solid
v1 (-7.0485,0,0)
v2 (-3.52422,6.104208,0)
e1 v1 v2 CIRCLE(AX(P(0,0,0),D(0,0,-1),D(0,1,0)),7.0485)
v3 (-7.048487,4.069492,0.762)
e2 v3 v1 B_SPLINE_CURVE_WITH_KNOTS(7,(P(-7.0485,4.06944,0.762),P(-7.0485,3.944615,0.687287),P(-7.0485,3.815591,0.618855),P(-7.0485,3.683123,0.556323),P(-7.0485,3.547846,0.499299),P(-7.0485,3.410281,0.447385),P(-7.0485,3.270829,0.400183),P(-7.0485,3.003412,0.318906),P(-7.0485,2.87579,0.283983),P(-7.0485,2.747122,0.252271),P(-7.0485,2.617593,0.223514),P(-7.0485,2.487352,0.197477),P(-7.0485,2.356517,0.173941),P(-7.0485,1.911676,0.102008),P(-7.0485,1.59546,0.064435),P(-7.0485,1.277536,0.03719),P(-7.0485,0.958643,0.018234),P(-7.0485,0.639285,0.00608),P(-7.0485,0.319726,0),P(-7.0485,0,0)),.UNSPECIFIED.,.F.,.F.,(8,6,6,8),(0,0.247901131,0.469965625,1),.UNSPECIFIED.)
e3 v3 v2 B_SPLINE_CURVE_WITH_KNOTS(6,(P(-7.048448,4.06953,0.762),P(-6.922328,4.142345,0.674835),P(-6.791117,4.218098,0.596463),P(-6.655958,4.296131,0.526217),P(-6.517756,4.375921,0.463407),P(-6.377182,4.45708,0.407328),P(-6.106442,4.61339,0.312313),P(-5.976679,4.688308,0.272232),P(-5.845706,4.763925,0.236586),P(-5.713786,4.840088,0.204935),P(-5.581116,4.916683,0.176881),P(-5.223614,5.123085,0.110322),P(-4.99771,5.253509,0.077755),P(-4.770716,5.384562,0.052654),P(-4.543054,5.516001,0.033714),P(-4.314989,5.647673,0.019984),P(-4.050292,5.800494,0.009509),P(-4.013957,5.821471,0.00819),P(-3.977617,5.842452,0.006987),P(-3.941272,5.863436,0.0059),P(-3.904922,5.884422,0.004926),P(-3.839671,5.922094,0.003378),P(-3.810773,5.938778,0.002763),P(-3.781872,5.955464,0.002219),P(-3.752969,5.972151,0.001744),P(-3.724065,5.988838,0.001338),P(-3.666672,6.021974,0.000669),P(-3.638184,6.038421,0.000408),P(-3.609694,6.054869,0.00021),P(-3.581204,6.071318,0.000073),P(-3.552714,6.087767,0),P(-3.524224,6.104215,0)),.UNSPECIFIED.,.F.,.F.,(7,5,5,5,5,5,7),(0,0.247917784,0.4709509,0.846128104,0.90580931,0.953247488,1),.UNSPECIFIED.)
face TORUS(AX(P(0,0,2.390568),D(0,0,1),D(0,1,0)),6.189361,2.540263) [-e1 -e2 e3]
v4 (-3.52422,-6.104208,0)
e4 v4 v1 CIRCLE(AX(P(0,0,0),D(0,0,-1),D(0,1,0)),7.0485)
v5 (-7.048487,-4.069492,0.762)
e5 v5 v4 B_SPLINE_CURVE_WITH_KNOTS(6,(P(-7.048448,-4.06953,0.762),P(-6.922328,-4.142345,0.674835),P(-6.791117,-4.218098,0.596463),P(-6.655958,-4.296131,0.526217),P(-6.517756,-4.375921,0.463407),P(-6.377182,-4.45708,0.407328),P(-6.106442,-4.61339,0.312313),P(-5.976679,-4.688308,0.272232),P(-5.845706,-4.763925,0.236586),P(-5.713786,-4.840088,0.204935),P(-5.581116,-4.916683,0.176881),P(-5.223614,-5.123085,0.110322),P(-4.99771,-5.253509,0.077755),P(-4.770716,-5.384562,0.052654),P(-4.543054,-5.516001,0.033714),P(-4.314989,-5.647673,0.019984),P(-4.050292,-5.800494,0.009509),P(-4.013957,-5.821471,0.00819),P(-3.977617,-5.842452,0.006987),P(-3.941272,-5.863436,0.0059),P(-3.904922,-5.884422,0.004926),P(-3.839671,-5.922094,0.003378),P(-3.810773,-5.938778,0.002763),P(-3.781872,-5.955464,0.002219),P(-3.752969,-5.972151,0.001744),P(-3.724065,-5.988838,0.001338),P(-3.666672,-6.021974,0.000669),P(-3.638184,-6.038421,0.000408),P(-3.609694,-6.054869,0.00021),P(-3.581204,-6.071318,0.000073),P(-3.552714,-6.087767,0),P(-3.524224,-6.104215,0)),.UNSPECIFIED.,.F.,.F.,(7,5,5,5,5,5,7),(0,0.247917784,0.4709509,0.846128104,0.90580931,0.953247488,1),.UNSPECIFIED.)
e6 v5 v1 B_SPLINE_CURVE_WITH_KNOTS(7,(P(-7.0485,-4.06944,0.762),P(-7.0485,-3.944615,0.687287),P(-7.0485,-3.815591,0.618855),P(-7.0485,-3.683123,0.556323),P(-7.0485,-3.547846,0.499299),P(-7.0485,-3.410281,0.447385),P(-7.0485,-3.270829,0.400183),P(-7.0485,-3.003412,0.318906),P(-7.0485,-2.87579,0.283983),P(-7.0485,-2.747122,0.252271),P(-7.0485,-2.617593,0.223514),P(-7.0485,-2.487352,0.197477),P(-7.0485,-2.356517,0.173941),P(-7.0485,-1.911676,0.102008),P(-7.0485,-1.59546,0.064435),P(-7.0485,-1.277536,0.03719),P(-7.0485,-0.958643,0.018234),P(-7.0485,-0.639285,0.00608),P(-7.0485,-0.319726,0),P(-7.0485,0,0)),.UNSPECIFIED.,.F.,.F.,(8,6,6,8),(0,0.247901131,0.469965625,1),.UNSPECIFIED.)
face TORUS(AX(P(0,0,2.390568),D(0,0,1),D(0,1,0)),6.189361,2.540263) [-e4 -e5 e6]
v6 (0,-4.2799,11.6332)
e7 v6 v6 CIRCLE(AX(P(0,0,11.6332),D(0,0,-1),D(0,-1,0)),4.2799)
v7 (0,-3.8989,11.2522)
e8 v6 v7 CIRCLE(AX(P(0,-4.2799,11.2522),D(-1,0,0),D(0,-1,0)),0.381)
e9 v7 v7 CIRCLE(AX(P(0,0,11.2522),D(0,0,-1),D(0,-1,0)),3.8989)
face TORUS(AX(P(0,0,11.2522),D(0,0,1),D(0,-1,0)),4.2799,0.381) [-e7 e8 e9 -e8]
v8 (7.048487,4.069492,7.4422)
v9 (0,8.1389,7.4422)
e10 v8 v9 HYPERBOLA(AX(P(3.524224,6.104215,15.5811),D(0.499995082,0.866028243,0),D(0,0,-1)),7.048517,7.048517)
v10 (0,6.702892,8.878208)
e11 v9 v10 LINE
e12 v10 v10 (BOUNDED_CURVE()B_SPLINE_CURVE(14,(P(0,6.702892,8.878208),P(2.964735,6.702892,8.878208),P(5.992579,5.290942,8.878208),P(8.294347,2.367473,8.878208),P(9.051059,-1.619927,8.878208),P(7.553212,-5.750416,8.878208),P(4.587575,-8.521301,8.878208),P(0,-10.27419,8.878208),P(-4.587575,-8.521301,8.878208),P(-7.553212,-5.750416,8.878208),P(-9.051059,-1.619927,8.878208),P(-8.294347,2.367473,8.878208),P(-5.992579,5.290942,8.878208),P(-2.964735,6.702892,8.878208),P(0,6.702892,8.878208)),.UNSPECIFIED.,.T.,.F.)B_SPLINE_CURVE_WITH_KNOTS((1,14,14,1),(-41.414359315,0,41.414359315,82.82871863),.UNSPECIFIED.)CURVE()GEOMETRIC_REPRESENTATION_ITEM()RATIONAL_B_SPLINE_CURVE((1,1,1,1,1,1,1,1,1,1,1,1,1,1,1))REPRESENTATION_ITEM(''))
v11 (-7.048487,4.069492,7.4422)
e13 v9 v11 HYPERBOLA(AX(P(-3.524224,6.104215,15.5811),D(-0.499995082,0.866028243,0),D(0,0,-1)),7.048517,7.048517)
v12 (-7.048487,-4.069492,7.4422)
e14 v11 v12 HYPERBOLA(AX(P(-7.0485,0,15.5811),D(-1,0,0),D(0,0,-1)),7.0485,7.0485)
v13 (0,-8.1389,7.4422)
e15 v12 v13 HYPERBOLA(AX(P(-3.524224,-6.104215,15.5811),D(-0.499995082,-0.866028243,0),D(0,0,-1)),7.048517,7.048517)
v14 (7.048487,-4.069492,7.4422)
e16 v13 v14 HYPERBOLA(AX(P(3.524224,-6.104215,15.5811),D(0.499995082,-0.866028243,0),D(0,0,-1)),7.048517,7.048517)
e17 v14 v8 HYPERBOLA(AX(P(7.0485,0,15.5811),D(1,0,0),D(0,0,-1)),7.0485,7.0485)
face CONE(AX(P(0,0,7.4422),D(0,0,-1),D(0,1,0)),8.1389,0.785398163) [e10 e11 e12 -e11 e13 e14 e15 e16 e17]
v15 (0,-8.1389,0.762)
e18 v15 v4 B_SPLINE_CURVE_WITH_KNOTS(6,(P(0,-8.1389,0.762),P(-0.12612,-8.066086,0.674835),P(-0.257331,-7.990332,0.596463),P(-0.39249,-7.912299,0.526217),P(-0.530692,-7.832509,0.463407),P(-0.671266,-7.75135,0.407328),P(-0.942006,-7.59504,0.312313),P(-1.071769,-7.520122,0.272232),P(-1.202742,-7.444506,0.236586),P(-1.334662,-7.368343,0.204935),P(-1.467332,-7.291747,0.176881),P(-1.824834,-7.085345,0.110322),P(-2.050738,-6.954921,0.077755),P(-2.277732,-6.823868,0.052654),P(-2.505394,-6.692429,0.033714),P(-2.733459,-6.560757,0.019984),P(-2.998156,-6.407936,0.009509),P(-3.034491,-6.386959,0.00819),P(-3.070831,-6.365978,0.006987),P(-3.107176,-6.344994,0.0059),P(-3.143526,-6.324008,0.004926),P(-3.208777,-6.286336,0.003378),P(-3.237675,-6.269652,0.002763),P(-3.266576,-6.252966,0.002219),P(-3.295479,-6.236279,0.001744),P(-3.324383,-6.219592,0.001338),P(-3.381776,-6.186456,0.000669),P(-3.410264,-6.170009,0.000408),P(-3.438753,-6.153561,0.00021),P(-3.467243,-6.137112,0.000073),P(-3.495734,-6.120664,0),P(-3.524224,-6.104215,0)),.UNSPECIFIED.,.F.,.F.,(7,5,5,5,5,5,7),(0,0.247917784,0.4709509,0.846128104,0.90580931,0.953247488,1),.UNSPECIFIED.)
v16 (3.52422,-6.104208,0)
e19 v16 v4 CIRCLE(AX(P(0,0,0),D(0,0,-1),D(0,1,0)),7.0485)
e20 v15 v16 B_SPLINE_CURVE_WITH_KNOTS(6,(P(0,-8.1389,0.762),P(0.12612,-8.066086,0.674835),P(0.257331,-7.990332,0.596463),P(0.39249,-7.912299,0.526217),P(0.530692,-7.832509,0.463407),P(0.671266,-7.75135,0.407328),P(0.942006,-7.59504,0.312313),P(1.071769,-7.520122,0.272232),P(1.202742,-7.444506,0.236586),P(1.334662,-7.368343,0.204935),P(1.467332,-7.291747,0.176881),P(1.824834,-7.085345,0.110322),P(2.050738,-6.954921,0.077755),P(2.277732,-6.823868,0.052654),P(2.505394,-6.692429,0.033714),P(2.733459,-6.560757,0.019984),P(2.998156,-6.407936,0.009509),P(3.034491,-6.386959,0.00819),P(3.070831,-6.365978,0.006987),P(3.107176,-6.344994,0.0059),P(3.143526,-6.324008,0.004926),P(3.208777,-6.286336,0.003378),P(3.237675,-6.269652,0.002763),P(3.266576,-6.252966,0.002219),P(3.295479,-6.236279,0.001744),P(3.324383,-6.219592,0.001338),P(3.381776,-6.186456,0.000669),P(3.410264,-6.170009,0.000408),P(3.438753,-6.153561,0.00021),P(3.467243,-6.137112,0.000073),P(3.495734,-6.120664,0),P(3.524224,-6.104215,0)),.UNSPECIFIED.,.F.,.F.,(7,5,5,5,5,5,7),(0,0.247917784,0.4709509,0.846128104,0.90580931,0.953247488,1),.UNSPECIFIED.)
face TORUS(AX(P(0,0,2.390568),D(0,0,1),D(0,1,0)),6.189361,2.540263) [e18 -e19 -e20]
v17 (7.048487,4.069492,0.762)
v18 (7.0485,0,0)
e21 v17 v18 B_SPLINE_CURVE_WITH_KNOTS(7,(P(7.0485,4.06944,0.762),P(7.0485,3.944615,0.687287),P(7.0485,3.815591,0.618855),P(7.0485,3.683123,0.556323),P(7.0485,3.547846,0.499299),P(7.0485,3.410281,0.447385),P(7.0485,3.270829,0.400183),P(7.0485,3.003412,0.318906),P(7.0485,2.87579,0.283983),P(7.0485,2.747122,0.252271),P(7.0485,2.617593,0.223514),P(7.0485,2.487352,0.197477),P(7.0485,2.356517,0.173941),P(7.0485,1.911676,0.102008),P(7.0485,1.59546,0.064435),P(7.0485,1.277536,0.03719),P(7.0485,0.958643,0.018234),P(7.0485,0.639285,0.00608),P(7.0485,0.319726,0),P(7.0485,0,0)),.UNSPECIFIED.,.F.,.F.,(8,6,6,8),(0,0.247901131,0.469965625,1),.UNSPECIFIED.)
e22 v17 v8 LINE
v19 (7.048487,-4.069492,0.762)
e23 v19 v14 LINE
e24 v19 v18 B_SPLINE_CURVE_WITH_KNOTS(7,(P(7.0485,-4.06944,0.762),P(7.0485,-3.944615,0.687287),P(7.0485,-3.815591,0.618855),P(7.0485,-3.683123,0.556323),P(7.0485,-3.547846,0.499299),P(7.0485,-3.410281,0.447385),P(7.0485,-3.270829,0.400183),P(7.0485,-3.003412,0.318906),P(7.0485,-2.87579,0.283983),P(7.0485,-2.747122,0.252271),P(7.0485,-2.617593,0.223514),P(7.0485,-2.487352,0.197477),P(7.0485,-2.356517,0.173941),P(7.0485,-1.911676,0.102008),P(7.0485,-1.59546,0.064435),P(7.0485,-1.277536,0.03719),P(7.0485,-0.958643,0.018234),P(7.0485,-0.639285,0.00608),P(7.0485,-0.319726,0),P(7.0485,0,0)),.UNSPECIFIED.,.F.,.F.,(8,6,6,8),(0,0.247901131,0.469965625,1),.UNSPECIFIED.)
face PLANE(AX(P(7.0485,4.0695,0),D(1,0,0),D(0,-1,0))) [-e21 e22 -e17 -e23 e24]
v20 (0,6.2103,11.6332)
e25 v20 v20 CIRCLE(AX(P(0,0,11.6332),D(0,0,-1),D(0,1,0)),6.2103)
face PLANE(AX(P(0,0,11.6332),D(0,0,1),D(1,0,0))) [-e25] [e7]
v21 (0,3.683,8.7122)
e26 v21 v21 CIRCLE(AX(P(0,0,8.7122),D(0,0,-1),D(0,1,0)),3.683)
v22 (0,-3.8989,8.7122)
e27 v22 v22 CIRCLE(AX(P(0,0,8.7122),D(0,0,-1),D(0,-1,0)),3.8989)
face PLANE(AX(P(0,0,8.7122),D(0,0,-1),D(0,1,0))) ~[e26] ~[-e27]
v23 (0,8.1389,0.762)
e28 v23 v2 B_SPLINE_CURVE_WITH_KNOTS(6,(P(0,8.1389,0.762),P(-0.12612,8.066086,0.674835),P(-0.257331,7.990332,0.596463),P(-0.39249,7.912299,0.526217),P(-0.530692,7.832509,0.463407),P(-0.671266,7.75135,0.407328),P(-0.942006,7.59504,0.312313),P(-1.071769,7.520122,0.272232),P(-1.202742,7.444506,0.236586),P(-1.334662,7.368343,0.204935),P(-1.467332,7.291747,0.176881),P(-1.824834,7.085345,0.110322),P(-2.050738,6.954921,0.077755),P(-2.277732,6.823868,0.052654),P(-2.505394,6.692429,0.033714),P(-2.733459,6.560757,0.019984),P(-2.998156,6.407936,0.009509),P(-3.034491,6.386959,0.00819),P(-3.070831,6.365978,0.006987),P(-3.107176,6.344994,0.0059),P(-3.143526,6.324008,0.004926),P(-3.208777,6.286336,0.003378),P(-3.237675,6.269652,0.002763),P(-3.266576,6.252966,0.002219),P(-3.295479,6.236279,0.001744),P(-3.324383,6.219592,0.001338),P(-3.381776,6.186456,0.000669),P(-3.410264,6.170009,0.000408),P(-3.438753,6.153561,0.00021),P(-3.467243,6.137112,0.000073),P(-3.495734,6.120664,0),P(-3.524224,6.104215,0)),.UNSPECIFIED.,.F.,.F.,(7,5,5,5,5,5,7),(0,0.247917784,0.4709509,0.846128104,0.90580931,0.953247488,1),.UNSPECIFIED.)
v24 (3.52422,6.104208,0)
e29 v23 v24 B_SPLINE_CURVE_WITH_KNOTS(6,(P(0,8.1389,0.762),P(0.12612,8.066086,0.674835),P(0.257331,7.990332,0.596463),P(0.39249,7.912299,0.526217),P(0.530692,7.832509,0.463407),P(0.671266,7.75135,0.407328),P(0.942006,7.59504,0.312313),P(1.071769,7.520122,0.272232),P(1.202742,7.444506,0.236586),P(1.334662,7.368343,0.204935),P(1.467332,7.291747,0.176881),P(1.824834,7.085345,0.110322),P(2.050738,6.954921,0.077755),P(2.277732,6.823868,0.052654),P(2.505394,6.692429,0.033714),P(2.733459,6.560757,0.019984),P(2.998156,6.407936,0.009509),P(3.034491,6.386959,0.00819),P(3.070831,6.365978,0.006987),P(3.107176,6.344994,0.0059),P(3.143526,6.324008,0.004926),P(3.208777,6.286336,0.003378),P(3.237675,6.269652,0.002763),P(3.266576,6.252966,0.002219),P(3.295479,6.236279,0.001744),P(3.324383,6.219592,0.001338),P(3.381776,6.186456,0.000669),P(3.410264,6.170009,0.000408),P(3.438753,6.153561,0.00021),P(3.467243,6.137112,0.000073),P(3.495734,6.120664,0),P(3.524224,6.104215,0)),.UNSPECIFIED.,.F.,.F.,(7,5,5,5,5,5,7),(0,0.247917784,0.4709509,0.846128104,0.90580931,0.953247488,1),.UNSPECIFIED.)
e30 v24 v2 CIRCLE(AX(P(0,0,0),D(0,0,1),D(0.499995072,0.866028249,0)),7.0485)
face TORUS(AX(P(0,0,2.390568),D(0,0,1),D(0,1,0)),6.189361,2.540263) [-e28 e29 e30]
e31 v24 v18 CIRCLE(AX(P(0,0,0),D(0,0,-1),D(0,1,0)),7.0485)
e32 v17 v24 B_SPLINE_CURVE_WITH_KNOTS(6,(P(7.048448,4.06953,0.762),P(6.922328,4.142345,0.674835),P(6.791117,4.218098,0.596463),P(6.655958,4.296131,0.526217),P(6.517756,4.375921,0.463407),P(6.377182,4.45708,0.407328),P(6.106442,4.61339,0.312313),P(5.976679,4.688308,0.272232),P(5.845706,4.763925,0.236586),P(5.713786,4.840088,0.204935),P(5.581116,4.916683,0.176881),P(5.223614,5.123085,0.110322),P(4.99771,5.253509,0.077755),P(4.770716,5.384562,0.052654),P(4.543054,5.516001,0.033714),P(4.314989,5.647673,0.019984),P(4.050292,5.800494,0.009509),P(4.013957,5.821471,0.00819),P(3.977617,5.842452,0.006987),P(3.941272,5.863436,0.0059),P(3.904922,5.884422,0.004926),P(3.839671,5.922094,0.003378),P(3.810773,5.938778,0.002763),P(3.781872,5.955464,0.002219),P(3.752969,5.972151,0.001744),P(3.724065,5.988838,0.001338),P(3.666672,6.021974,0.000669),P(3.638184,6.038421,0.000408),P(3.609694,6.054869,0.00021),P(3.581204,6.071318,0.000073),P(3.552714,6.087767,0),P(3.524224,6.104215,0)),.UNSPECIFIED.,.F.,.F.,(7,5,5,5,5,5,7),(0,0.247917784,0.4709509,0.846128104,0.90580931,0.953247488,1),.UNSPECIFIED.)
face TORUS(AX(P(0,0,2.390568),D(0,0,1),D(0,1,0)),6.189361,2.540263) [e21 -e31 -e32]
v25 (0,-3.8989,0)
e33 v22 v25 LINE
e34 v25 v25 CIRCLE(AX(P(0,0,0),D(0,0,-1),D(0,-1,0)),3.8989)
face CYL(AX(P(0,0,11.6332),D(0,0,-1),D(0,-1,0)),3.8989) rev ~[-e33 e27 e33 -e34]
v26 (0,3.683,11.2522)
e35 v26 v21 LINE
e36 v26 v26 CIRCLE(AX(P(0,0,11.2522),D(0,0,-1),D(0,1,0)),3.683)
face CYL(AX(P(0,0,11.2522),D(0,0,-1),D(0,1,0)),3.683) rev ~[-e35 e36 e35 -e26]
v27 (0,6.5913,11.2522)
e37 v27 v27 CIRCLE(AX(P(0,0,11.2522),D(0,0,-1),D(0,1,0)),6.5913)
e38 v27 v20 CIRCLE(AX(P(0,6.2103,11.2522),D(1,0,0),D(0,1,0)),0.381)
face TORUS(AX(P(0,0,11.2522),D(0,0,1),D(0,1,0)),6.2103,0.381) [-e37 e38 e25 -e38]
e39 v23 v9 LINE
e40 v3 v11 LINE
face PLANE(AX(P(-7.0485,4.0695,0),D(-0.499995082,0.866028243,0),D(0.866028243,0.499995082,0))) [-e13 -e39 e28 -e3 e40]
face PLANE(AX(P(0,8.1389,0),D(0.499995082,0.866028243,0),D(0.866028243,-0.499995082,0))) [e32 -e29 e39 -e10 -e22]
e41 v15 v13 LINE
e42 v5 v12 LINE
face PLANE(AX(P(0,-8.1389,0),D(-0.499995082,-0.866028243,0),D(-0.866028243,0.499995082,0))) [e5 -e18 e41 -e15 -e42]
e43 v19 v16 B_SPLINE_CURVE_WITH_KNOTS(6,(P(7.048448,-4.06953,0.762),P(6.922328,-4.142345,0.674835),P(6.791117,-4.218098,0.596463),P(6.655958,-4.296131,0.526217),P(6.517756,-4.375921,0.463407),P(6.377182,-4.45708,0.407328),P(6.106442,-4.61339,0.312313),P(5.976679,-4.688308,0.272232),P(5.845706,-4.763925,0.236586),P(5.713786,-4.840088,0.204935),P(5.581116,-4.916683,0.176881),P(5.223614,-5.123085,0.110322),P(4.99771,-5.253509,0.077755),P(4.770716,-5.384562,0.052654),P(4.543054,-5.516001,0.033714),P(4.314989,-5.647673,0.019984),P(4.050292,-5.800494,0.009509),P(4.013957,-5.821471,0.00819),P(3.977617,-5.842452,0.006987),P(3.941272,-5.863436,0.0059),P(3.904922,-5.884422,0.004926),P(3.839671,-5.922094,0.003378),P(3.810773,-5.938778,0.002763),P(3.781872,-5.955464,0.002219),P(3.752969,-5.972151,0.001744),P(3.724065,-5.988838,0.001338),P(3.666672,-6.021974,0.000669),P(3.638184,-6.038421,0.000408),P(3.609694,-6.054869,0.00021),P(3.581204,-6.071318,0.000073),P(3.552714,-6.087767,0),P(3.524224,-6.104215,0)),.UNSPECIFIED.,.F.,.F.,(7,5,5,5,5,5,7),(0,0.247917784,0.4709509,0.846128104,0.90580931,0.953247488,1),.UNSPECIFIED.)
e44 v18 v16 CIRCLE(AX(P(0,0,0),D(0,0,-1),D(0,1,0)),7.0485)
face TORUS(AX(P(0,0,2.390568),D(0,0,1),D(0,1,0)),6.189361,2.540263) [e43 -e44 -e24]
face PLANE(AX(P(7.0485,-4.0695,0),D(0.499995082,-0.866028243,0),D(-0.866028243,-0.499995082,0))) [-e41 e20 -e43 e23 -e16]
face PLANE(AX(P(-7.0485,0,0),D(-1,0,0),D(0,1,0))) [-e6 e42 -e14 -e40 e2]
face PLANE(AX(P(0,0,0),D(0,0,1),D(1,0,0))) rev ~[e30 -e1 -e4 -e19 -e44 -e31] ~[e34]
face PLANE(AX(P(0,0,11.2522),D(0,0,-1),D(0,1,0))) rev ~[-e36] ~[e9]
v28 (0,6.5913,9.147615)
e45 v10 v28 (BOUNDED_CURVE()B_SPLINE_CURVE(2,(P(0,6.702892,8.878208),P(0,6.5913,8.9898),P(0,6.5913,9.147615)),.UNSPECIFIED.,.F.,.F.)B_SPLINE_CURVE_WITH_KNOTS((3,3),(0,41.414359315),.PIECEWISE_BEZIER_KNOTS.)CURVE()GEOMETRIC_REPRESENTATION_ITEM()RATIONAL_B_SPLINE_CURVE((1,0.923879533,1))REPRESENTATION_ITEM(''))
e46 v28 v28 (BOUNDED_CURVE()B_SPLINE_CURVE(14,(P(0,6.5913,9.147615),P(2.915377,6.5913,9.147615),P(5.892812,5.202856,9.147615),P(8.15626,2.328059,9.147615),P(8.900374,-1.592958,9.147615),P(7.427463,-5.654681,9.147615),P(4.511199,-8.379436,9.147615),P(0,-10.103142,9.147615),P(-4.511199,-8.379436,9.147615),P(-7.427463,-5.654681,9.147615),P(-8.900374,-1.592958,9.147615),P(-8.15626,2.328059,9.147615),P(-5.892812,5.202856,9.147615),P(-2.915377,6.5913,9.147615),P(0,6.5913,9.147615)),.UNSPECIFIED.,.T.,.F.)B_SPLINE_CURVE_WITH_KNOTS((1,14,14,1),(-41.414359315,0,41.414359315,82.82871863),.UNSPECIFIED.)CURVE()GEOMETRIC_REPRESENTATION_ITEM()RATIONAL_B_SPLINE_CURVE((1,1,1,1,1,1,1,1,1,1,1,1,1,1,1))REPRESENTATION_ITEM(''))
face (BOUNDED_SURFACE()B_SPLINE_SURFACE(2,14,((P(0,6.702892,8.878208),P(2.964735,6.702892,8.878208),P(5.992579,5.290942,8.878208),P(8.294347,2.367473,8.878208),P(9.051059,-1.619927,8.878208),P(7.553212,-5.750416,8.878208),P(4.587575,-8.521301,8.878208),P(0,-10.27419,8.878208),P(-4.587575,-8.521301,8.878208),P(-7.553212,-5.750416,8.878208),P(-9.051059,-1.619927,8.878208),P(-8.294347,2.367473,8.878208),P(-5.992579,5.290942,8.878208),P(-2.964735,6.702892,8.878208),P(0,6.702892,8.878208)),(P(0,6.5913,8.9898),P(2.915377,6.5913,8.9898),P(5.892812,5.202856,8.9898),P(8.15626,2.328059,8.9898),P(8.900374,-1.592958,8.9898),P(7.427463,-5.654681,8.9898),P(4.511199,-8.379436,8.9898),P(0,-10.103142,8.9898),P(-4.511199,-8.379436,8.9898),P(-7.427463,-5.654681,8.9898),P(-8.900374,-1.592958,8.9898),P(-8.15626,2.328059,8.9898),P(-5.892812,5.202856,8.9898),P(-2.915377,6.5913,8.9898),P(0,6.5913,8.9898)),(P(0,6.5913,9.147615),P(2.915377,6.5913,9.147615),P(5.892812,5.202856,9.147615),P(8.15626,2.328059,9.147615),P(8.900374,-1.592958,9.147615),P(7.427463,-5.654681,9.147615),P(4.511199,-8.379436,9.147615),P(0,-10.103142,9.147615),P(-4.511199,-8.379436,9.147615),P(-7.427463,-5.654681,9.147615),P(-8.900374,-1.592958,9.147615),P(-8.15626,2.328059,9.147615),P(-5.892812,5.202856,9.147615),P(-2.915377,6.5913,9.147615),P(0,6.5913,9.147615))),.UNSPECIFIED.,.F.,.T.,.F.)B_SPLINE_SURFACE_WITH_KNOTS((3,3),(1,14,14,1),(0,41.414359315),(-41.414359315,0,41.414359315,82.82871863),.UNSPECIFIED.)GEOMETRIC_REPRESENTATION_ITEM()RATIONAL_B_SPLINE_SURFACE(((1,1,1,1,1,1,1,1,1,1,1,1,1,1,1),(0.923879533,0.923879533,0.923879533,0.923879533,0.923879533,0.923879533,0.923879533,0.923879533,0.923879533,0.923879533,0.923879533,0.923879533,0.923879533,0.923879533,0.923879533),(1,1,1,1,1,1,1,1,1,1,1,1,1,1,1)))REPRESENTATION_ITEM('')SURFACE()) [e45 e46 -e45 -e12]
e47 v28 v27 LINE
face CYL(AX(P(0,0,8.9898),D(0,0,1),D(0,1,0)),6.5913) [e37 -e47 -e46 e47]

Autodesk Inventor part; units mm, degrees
ref_plane "YZ Plane" through (0, 0, 0) normal (1, 0, 0) x (0, 1, 0)
ref_plane "XZ Plane" through (0, 0, 0) normal (0, 1, 0) x (-1, 0, 0)
ref_plane "XY Plane" through (0, 0, 0) normal (0, 0, 1) x (1, 0, 0)
sketch "Sketch1" plane through (0, 0, 0) normal (0, 0, 1) x (1, 0, 0)
  line L0 (0, 8.1389) -> (7.0485, 4.0695)
  line L1 (7.0485, 4.0695) -> (7.0485, -4.0695)
  line L2 (7.0485, -4.0695) -> (0, -8.1389)
  line L3 (0, -8.1389) -> (-7.0485, -4.0695)
  line L4 (-7.0485, -4.0695) -> (-7.0485, 4.0695)
  line L5 (-7.0485, 4.0695) -> (0, 8.1389)
  line L6 (0, 11.3945) -> (0, -11.3945) projected
  line L7 (-9.8679, 0) -> (9.8679, 0) projected
  point P0 (0, 0)
  dimension "d0" = 14.097
extrude "Extrusion1" add sketch "Sketch1" along normal blind 11.6332
sketch "Sketch2" plane through (0, 0, 0) normal (1, 0, 0) x (0, 1, 0)
  line L0 (8.1389, 0) -> (8.1389, 11.6332) projected
  line L1 (4.0695, 11.6332) -> (-4.0695, 11.6332) projected
  line L2 (8.1389, 11.6332) -> (4.0695, 11.6332) projected
  line L3 (4.0695, 11.6332) -> (8.1389, 11.6332) projected
  line L4 (-4.0695, 11.6332) -> (4.0695, 11.6332) projected
  line L5 (-8.1389, 11.6332) -> (-4.0695, 11.6332) projected
  line L6 (-4.0695, 11.6332) -> (-8.1389, 11.6332) projected
  line L7 (8.1389, 7.4422) -> (6.5913, 8.9898)
  line L8 (6.5913, 8.9898) -> (6.5913, 11.6332)
  line L9 (8.1389, 11.6332) -> (8.1389, 7.4422)
  line L10 (6.223, 11.2522) -> (3.683, 11.2522)
  line L11 (3.683, 11.2522) -> (3.683, 8.7122)
  line L12 (3.683, 8.7122) -> (6.223, 8.7122)
  line L13 (6.223, 8.7122) -> (6.223, 11.2522)
  line L14 (0, 18.0282) -> (0, -3.0895) projected
  arc A0 (7.0485, 0) -> (8.1389, 0.762) centre (6.1895, 2.3903) ccw
  line L15 (8.1389, 0) -> (4.0695, 0) projected
  line L16 (7.0485, 0) -> (8.1389, 0)
  line L17 (8.1389, 0.762) -> (8.1389, 0)
  dimension "d3" = 4.191
  dimension "d4" = 45
  dimension "d5" = 6.5913
  dimension "d6" = 3.683
  dimension "d7" = 0.381
  dimension "d8" = 2.54
  dimension "d9" = 2.54
  dimension "d11" = 7.0485
  dimension "d12" = 0.762
  dimension "d13" = 2.54
revolve "Revolution1" cut sketch "Sketch2" angle 360 about axis through (0, 0, 0) along (0, 0, -1) contours L7 L8 L2 L0
revolve "Revolution2" cut sketch "Sketch2" angle 360 about axis through (0, 0, 0) along (0, 0, -1) contours L15 A0 L0
hole "Hole1" at (0, 0, 11.6332) direction (0, 0, -1) diameter 7.7978 end through all thread size "3/8-16 UNC" class "2B" standard "ANSI Unified Screw Threads"
fillet "Fillet1" radius 0.381 3 edges at (0, -6.5913, 8.9898) (0, -6.5913, 11.6332) (0, 3.8989, 11.6332)
revolve "Revolution3" add sketch "Sketch2" angle 360 about axis through (0, 0, 0) along (0, 0, -1) contours L13 L12 L11 L10
properties part number "HW-00026" material "Steel"
